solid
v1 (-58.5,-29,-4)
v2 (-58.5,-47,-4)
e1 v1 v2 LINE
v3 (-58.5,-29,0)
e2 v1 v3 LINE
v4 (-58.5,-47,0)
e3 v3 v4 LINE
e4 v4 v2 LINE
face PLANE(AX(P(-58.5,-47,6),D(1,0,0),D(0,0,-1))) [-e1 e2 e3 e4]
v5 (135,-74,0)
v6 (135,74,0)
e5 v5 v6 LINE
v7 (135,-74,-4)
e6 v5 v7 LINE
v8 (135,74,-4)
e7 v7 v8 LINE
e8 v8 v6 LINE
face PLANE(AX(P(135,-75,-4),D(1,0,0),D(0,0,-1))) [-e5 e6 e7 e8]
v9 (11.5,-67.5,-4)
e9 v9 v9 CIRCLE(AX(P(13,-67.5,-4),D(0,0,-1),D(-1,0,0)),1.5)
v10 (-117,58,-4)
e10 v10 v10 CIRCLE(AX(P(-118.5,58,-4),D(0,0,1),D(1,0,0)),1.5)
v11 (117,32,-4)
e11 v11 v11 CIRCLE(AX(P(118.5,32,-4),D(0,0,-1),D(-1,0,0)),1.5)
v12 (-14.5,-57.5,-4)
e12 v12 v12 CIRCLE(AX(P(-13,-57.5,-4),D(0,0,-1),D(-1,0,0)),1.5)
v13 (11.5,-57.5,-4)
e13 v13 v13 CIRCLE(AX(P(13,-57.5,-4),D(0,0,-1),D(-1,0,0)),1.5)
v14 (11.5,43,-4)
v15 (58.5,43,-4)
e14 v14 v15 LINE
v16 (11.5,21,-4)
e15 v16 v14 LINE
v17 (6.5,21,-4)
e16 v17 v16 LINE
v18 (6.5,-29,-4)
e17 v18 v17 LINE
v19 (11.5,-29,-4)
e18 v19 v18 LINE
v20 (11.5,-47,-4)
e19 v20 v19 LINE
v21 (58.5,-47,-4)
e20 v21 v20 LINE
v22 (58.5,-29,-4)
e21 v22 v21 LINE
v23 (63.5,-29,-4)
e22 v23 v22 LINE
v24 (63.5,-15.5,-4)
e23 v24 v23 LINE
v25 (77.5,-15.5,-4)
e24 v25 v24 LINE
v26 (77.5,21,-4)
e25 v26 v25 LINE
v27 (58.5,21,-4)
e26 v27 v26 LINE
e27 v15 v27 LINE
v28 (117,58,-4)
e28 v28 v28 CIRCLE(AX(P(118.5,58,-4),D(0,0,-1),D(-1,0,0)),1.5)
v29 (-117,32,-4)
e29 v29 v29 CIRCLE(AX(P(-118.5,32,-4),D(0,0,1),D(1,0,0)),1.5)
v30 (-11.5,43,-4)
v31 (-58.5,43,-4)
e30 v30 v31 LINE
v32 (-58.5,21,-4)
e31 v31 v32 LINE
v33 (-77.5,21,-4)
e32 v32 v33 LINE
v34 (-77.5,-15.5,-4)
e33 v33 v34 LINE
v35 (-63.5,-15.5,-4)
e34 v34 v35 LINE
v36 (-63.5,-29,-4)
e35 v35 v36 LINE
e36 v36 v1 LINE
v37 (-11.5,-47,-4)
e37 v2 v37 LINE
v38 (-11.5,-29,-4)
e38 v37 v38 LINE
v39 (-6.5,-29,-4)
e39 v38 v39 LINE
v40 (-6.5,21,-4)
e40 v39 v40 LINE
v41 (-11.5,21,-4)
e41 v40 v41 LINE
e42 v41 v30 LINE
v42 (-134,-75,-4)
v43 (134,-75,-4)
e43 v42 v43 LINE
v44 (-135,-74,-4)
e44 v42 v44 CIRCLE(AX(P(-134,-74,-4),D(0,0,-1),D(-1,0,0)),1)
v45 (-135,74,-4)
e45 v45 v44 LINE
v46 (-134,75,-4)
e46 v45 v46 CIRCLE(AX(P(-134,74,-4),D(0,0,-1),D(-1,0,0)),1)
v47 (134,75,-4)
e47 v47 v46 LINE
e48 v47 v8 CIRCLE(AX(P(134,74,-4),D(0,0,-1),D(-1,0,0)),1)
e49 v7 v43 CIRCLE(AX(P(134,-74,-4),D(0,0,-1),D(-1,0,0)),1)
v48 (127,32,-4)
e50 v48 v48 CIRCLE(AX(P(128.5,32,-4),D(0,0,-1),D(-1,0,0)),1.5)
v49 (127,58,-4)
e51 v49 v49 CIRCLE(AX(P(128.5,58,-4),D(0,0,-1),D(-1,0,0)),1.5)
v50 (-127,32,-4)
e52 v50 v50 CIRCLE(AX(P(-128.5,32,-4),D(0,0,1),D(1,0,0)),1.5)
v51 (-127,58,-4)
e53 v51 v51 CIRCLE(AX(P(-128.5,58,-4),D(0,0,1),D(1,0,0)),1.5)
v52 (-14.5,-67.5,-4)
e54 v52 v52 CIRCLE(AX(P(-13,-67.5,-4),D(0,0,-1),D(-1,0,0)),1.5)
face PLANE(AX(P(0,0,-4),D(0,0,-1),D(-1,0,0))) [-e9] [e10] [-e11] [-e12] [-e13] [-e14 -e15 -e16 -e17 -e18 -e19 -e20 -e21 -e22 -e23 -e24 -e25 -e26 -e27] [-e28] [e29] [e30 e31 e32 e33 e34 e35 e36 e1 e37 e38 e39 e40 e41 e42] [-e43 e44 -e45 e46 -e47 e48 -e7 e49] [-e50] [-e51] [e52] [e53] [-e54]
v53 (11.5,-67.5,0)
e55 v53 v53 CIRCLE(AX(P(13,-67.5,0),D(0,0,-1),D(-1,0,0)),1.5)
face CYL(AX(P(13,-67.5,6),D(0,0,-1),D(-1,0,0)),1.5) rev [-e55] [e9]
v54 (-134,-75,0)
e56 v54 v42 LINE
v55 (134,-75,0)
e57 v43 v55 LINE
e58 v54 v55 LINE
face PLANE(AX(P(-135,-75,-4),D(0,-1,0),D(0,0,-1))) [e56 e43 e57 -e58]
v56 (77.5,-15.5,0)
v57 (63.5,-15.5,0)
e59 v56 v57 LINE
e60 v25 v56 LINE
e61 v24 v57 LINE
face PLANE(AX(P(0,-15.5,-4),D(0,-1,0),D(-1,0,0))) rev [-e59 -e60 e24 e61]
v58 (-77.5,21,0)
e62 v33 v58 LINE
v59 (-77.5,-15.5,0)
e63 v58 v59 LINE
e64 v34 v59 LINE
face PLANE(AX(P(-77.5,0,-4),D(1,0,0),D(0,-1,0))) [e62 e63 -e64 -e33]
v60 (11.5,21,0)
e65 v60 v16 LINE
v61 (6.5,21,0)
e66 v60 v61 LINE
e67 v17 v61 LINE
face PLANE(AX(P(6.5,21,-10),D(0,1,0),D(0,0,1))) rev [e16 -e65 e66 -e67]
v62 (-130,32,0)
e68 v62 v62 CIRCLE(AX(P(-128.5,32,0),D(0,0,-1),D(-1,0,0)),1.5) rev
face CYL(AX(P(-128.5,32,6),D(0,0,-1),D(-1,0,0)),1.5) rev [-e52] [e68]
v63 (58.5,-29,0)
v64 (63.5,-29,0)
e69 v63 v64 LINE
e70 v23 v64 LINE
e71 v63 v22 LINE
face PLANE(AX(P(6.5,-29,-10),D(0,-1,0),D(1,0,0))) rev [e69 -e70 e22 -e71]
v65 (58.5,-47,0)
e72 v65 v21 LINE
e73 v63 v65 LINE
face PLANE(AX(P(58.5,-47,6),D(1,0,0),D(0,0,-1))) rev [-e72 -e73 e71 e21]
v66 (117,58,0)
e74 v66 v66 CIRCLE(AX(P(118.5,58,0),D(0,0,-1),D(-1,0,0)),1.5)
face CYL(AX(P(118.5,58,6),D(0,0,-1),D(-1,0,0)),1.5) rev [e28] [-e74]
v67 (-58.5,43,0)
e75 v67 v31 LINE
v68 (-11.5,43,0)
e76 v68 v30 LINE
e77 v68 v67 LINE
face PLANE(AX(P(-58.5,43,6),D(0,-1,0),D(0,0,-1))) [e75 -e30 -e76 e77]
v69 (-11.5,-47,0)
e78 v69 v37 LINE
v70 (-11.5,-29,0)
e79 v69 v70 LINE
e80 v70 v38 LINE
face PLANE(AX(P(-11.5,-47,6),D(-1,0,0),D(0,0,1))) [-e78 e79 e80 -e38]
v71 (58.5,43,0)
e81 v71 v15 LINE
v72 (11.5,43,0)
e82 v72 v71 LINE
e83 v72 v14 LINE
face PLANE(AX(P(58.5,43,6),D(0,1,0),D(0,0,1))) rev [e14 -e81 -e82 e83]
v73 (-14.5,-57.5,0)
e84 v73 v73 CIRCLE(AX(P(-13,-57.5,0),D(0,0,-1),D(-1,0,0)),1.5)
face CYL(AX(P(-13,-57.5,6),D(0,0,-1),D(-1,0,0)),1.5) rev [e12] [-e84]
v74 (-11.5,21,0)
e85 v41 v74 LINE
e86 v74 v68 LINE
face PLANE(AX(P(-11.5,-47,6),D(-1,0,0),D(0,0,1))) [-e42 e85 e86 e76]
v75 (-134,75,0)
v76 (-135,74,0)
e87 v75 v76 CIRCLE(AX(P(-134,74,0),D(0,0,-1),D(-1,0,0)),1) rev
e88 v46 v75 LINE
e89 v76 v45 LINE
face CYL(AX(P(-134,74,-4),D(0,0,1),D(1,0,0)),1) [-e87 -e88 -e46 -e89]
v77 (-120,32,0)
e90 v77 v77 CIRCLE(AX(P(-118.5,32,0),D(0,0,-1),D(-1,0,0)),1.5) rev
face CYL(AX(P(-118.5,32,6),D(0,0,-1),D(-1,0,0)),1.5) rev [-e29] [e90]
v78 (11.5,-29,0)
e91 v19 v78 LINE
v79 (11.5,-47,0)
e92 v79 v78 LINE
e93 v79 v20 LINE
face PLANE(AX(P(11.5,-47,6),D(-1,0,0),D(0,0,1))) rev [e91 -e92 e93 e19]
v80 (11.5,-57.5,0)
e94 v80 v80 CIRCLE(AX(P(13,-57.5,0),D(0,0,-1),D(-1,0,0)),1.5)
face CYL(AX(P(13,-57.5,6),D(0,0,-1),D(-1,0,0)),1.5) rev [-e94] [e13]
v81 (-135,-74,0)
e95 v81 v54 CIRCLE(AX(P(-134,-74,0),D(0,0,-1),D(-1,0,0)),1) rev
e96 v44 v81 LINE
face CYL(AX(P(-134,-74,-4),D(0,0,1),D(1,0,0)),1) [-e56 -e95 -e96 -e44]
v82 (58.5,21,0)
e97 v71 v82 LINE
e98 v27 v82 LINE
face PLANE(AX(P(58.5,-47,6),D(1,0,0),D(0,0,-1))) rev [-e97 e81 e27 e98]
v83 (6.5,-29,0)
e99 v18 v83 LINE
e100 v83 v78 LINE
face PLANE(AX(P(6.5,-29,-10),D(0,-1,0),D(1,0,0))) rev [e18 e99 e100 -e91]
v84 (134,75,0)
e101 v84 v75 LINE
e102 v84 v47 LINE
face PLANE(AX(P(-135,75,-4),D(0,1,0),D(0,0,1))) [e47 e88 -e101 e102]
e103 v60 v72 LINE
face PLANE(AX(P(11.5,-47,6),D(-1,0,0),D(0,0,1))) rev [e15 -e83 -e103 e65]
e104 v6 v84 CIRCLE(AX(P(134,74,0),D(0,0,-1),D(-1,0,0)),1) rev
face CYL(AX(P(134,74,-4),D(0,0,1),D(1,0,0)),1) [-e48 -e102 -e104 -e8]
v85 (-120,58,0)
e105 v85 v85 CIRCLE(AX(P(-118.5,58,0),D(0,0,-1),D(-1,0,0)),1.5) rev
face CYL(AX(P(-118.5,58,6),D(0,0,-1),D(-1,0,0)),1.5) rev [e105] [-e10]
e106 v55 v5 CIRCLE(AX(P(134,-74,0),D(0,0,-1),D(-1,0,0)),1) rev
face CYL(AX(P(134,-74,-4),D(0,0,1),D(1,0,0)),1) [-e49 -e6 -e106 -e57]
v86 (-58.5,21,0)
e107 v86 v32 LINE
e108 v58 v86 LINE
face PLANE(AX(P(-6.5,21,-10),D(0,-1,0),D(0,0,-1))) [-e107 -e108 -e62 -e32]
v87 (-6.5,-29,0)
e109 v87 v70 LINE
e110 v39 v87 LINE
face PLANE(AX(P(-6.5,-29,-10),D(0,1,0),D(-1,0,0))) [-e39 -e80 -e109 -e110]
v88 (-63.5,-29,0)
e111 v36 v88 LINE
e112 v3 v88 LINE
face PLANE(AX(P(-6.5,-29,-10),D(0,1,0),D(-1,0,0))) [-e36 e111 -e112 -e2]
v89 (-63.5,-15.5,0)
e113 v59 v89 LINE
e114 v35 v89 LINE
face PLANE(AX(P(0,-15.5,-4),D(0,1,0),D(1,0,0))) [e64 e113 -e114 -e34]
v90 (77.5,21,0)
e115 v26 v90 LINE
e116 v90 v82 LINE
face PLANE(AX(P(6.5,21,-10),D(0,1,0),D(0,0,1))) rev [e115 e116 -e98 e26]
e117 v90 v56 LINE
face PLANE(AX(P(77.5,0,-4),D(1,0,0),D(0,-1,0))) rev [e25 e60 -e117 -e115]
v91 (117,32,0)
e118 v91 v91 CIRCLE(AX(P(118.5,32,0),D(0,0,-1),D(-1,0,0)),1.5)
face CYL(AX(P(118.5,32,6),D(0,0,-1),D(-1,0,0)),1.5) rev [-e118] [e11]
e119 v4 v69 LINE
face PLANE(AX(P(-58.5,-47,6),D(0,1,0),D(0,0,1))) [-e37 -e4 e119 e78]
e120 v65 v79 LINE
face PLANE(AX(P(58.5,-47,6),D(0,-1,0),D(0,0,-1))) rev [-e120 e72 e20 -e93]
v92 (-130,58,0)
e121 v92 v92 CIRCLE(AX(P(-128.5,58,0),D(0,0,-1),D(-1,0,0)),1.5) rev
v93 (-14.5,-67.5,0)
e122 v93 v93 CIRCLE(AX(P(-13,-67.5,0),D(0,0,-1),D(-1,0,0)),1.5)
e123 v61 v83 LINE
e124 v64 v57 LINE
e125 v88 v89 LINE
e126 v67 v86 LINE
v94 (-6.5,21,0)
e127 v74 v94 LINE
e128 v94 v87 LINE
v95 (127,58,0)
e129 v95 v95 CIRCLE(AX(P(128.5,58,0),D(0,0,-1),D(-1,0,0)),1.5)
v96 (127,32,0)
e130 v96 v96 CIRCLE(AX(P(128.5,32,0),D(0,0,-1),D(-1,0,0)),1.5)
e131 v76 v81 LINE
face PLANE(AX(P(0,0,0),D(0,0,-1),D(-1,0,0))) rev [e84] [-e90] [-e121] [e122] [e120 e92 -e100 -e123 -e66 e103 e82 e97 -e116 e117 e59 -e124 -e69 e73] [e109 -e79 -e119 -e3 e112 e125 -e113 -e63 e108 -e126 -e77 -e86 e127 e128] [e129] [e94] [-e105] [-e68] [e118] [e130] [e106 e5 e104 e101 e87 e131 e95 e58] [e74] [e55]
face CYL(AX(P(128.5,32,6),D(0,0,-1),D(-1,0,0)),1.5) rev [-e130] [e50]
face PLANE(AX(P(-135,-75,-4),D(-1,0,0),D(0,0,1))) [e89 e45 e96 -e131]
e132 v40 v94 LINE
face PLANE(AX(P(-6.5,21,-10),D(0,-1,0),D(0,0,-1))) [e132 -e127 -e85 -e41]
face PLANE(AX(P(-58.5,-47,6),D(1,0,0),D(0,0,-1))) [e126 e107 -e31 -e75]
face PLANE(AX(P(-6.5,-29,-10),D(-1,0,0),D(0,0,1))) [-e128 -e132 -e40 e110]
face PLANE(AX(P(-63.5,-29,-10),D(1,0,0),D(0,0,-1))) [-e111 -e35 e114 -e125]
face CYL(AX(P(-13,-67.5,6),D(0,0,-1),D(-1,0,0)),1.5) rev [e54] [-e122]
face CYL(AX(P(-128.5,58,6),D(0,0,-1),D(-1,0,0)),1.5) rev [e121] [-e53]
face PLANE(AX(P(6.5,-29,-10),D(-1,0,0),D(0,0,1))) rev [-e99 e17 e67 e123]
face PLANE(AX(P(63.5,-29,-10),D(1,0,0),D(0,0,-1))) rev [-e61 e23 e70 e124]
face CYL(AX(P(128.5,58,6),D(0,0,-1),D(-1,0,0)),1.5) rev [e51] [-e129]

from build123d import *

# Parameters (mm, degrees)
SKETCH_1_W             = 270
SKETCH_1_H             = 150
SM_BASE_FLANGE_1_DEPTH = 4
FILLET_1_R             = 1
SKETCH_2_R             = 1.5
CUT_EXTRUDE_1_DEPTH    = 10
SKETCH_3_R             = 1.5
CUT_EXTRUDE_2_DEPTH    = 10
SKETCH_4_W             = 47
SKETCH_4_H             = 90
CUT_EXTRUDE_3_DEPTH    = 10
SKETCH_5_W             = 57
SKETCH_5_H             = 50
CUT_EXTRUDE_4_DEPTH    = 10
SKETCH_6_W             = 14
SKETCH_6_H             = 36.5
CUT_EXTRUDE_5_DEPTH    = 10


# Sheet-metal steps are written as plain solids
with BuildPart() as part:
    # Sketch 1 → 基体-法兰1 (new body)
    with BuildSketch(Plane.XY):
        Rectangle(SKETCH_1_W, SKETCH_1_H)
    extrude(amount=-SM_BASE_FLANGE_1_DEPTH)

    # 圆角1
    fillet_1_edges = [part.edges().sort_by_distance(p)[0] for p in [
        (135, -75, -2),
        (-135, -75, -2),
        (-135, 75, -2),
        (135, 75, -2),
    ]]
    fillet(fillet_1_edges, radius=FILLET_1_R)

    # Sketch 2 → 切除-拉伸1 (cut)
    with BuildSketch(Plane(origin=(0, 0, -4), x_dir=(-1, 0, 0), z_dir=(0, 0, -1))):
        with Locations((-13, -67.5)):
            Circle(SKETCH_2_R)
        with Locations((-13, -57.5)):
            Circle(SKETCH_2_R)
        with Locations((13, -57.5)):
            Circle(SKETCH_2_R)
        with Locations((13, -67.5)):
            Circle(SKETCH_2_R)
    extrude(amount=-CUT_EXTRUDE_1_DEPTH, mode=Mode.SUBTRACT)

    # 草图3 → 切除-拉伸2 (cut)
    with BuildSketch(Plane(origin=(0, 0, -4), x_dir=(-1, 0, 0), z_dir=(0, 0, -1))):
        with Locations((-128.5, 58)):
            Circle(SKETCH_3_R)
        with Locations((-128.5, 32)):
            Circle(SKETCH_3_R)
        with Locations((-118.5, 58)):
            Circle(SKETCH_3_R)
        with Locations((-118.5, 32)):
            Circle(SKETCH_3_R)
    cut_extrude_2 = extrude(amount=-CUT_EXTRUDE_2_DEPTH, mode=Mode.SUBTRACT)

    # 镜向1: 切除-拉伸2 across plane
    add(cut_extrude_2.mirror(Plane(origin=(0, 0, 0), x_dir=(0, 0, 1), z_dir=(1, 0, 0))), mode=Mode.SUBTRACT)

    # 草图4 → 切除-拉伸3 (cut)
    with BuildSketch(Plane(origin=(0, 0, -4), x_dir=(-1, 0, 0), z_dir=(0, 0, -1))):
        with Locations((-35, -2)):
            Rectangle(SKETCH_4_W, SKETCH_4_H)
    cut_extrude_3 = extrude(amount=-CUT_EXTRUDE_3_DEPTH, mode=Mode.SUBTRACT)

    # 草图5 → 切除-拉伸4 (cut)
    with BuildSketch(Plane.XY):
        with Locations((35, -4)):
            Rectangle(SKETCH_5_W, SKETCH_5_H)
    cut_extrude_4 = extrude(amount=-CUT_EXTRUDE_4_DEPTH, mode=Mode.SUBTRACT)

    # 草图6 → 切除-拉伸5 (cut)
    with BuildSketch(Plane.XY):
        with Locations((70.5, 2.75)):
            Rectangle(SKETCH_6_W, SKETCH_6_H)
    cut_extrude_5 = extrude(amount=-CUT_EXTRUDE_5_DEPTH, mode=Mode.SUBTRACT)

    # 镜向2: 切除-拉伸3, 切除-拉伸4, 切除-拉伸5 across plane
    add(cut_extrude_3.mirror(Plane(origin=(0, 0, 0), x_dir=(0, 0, 1), z_dir=(1, 0, 0))), mode=Mode.SUBTRACT)
    add(cut_extrude_4.mirror(Plane(origin=(0, 0, 0), x_dir=(0, 0, 1), z_dir=(1, 0, 0))), mode=Mode.SUBTRACT)
    add(cut_extrude_5.mirror(Plane(origin=(0, 0, 0), x_dir=(0, 0, 1), z_dir=(1, 0, 0))), mode=Mode.SUBTRACT)


solid = part.part
